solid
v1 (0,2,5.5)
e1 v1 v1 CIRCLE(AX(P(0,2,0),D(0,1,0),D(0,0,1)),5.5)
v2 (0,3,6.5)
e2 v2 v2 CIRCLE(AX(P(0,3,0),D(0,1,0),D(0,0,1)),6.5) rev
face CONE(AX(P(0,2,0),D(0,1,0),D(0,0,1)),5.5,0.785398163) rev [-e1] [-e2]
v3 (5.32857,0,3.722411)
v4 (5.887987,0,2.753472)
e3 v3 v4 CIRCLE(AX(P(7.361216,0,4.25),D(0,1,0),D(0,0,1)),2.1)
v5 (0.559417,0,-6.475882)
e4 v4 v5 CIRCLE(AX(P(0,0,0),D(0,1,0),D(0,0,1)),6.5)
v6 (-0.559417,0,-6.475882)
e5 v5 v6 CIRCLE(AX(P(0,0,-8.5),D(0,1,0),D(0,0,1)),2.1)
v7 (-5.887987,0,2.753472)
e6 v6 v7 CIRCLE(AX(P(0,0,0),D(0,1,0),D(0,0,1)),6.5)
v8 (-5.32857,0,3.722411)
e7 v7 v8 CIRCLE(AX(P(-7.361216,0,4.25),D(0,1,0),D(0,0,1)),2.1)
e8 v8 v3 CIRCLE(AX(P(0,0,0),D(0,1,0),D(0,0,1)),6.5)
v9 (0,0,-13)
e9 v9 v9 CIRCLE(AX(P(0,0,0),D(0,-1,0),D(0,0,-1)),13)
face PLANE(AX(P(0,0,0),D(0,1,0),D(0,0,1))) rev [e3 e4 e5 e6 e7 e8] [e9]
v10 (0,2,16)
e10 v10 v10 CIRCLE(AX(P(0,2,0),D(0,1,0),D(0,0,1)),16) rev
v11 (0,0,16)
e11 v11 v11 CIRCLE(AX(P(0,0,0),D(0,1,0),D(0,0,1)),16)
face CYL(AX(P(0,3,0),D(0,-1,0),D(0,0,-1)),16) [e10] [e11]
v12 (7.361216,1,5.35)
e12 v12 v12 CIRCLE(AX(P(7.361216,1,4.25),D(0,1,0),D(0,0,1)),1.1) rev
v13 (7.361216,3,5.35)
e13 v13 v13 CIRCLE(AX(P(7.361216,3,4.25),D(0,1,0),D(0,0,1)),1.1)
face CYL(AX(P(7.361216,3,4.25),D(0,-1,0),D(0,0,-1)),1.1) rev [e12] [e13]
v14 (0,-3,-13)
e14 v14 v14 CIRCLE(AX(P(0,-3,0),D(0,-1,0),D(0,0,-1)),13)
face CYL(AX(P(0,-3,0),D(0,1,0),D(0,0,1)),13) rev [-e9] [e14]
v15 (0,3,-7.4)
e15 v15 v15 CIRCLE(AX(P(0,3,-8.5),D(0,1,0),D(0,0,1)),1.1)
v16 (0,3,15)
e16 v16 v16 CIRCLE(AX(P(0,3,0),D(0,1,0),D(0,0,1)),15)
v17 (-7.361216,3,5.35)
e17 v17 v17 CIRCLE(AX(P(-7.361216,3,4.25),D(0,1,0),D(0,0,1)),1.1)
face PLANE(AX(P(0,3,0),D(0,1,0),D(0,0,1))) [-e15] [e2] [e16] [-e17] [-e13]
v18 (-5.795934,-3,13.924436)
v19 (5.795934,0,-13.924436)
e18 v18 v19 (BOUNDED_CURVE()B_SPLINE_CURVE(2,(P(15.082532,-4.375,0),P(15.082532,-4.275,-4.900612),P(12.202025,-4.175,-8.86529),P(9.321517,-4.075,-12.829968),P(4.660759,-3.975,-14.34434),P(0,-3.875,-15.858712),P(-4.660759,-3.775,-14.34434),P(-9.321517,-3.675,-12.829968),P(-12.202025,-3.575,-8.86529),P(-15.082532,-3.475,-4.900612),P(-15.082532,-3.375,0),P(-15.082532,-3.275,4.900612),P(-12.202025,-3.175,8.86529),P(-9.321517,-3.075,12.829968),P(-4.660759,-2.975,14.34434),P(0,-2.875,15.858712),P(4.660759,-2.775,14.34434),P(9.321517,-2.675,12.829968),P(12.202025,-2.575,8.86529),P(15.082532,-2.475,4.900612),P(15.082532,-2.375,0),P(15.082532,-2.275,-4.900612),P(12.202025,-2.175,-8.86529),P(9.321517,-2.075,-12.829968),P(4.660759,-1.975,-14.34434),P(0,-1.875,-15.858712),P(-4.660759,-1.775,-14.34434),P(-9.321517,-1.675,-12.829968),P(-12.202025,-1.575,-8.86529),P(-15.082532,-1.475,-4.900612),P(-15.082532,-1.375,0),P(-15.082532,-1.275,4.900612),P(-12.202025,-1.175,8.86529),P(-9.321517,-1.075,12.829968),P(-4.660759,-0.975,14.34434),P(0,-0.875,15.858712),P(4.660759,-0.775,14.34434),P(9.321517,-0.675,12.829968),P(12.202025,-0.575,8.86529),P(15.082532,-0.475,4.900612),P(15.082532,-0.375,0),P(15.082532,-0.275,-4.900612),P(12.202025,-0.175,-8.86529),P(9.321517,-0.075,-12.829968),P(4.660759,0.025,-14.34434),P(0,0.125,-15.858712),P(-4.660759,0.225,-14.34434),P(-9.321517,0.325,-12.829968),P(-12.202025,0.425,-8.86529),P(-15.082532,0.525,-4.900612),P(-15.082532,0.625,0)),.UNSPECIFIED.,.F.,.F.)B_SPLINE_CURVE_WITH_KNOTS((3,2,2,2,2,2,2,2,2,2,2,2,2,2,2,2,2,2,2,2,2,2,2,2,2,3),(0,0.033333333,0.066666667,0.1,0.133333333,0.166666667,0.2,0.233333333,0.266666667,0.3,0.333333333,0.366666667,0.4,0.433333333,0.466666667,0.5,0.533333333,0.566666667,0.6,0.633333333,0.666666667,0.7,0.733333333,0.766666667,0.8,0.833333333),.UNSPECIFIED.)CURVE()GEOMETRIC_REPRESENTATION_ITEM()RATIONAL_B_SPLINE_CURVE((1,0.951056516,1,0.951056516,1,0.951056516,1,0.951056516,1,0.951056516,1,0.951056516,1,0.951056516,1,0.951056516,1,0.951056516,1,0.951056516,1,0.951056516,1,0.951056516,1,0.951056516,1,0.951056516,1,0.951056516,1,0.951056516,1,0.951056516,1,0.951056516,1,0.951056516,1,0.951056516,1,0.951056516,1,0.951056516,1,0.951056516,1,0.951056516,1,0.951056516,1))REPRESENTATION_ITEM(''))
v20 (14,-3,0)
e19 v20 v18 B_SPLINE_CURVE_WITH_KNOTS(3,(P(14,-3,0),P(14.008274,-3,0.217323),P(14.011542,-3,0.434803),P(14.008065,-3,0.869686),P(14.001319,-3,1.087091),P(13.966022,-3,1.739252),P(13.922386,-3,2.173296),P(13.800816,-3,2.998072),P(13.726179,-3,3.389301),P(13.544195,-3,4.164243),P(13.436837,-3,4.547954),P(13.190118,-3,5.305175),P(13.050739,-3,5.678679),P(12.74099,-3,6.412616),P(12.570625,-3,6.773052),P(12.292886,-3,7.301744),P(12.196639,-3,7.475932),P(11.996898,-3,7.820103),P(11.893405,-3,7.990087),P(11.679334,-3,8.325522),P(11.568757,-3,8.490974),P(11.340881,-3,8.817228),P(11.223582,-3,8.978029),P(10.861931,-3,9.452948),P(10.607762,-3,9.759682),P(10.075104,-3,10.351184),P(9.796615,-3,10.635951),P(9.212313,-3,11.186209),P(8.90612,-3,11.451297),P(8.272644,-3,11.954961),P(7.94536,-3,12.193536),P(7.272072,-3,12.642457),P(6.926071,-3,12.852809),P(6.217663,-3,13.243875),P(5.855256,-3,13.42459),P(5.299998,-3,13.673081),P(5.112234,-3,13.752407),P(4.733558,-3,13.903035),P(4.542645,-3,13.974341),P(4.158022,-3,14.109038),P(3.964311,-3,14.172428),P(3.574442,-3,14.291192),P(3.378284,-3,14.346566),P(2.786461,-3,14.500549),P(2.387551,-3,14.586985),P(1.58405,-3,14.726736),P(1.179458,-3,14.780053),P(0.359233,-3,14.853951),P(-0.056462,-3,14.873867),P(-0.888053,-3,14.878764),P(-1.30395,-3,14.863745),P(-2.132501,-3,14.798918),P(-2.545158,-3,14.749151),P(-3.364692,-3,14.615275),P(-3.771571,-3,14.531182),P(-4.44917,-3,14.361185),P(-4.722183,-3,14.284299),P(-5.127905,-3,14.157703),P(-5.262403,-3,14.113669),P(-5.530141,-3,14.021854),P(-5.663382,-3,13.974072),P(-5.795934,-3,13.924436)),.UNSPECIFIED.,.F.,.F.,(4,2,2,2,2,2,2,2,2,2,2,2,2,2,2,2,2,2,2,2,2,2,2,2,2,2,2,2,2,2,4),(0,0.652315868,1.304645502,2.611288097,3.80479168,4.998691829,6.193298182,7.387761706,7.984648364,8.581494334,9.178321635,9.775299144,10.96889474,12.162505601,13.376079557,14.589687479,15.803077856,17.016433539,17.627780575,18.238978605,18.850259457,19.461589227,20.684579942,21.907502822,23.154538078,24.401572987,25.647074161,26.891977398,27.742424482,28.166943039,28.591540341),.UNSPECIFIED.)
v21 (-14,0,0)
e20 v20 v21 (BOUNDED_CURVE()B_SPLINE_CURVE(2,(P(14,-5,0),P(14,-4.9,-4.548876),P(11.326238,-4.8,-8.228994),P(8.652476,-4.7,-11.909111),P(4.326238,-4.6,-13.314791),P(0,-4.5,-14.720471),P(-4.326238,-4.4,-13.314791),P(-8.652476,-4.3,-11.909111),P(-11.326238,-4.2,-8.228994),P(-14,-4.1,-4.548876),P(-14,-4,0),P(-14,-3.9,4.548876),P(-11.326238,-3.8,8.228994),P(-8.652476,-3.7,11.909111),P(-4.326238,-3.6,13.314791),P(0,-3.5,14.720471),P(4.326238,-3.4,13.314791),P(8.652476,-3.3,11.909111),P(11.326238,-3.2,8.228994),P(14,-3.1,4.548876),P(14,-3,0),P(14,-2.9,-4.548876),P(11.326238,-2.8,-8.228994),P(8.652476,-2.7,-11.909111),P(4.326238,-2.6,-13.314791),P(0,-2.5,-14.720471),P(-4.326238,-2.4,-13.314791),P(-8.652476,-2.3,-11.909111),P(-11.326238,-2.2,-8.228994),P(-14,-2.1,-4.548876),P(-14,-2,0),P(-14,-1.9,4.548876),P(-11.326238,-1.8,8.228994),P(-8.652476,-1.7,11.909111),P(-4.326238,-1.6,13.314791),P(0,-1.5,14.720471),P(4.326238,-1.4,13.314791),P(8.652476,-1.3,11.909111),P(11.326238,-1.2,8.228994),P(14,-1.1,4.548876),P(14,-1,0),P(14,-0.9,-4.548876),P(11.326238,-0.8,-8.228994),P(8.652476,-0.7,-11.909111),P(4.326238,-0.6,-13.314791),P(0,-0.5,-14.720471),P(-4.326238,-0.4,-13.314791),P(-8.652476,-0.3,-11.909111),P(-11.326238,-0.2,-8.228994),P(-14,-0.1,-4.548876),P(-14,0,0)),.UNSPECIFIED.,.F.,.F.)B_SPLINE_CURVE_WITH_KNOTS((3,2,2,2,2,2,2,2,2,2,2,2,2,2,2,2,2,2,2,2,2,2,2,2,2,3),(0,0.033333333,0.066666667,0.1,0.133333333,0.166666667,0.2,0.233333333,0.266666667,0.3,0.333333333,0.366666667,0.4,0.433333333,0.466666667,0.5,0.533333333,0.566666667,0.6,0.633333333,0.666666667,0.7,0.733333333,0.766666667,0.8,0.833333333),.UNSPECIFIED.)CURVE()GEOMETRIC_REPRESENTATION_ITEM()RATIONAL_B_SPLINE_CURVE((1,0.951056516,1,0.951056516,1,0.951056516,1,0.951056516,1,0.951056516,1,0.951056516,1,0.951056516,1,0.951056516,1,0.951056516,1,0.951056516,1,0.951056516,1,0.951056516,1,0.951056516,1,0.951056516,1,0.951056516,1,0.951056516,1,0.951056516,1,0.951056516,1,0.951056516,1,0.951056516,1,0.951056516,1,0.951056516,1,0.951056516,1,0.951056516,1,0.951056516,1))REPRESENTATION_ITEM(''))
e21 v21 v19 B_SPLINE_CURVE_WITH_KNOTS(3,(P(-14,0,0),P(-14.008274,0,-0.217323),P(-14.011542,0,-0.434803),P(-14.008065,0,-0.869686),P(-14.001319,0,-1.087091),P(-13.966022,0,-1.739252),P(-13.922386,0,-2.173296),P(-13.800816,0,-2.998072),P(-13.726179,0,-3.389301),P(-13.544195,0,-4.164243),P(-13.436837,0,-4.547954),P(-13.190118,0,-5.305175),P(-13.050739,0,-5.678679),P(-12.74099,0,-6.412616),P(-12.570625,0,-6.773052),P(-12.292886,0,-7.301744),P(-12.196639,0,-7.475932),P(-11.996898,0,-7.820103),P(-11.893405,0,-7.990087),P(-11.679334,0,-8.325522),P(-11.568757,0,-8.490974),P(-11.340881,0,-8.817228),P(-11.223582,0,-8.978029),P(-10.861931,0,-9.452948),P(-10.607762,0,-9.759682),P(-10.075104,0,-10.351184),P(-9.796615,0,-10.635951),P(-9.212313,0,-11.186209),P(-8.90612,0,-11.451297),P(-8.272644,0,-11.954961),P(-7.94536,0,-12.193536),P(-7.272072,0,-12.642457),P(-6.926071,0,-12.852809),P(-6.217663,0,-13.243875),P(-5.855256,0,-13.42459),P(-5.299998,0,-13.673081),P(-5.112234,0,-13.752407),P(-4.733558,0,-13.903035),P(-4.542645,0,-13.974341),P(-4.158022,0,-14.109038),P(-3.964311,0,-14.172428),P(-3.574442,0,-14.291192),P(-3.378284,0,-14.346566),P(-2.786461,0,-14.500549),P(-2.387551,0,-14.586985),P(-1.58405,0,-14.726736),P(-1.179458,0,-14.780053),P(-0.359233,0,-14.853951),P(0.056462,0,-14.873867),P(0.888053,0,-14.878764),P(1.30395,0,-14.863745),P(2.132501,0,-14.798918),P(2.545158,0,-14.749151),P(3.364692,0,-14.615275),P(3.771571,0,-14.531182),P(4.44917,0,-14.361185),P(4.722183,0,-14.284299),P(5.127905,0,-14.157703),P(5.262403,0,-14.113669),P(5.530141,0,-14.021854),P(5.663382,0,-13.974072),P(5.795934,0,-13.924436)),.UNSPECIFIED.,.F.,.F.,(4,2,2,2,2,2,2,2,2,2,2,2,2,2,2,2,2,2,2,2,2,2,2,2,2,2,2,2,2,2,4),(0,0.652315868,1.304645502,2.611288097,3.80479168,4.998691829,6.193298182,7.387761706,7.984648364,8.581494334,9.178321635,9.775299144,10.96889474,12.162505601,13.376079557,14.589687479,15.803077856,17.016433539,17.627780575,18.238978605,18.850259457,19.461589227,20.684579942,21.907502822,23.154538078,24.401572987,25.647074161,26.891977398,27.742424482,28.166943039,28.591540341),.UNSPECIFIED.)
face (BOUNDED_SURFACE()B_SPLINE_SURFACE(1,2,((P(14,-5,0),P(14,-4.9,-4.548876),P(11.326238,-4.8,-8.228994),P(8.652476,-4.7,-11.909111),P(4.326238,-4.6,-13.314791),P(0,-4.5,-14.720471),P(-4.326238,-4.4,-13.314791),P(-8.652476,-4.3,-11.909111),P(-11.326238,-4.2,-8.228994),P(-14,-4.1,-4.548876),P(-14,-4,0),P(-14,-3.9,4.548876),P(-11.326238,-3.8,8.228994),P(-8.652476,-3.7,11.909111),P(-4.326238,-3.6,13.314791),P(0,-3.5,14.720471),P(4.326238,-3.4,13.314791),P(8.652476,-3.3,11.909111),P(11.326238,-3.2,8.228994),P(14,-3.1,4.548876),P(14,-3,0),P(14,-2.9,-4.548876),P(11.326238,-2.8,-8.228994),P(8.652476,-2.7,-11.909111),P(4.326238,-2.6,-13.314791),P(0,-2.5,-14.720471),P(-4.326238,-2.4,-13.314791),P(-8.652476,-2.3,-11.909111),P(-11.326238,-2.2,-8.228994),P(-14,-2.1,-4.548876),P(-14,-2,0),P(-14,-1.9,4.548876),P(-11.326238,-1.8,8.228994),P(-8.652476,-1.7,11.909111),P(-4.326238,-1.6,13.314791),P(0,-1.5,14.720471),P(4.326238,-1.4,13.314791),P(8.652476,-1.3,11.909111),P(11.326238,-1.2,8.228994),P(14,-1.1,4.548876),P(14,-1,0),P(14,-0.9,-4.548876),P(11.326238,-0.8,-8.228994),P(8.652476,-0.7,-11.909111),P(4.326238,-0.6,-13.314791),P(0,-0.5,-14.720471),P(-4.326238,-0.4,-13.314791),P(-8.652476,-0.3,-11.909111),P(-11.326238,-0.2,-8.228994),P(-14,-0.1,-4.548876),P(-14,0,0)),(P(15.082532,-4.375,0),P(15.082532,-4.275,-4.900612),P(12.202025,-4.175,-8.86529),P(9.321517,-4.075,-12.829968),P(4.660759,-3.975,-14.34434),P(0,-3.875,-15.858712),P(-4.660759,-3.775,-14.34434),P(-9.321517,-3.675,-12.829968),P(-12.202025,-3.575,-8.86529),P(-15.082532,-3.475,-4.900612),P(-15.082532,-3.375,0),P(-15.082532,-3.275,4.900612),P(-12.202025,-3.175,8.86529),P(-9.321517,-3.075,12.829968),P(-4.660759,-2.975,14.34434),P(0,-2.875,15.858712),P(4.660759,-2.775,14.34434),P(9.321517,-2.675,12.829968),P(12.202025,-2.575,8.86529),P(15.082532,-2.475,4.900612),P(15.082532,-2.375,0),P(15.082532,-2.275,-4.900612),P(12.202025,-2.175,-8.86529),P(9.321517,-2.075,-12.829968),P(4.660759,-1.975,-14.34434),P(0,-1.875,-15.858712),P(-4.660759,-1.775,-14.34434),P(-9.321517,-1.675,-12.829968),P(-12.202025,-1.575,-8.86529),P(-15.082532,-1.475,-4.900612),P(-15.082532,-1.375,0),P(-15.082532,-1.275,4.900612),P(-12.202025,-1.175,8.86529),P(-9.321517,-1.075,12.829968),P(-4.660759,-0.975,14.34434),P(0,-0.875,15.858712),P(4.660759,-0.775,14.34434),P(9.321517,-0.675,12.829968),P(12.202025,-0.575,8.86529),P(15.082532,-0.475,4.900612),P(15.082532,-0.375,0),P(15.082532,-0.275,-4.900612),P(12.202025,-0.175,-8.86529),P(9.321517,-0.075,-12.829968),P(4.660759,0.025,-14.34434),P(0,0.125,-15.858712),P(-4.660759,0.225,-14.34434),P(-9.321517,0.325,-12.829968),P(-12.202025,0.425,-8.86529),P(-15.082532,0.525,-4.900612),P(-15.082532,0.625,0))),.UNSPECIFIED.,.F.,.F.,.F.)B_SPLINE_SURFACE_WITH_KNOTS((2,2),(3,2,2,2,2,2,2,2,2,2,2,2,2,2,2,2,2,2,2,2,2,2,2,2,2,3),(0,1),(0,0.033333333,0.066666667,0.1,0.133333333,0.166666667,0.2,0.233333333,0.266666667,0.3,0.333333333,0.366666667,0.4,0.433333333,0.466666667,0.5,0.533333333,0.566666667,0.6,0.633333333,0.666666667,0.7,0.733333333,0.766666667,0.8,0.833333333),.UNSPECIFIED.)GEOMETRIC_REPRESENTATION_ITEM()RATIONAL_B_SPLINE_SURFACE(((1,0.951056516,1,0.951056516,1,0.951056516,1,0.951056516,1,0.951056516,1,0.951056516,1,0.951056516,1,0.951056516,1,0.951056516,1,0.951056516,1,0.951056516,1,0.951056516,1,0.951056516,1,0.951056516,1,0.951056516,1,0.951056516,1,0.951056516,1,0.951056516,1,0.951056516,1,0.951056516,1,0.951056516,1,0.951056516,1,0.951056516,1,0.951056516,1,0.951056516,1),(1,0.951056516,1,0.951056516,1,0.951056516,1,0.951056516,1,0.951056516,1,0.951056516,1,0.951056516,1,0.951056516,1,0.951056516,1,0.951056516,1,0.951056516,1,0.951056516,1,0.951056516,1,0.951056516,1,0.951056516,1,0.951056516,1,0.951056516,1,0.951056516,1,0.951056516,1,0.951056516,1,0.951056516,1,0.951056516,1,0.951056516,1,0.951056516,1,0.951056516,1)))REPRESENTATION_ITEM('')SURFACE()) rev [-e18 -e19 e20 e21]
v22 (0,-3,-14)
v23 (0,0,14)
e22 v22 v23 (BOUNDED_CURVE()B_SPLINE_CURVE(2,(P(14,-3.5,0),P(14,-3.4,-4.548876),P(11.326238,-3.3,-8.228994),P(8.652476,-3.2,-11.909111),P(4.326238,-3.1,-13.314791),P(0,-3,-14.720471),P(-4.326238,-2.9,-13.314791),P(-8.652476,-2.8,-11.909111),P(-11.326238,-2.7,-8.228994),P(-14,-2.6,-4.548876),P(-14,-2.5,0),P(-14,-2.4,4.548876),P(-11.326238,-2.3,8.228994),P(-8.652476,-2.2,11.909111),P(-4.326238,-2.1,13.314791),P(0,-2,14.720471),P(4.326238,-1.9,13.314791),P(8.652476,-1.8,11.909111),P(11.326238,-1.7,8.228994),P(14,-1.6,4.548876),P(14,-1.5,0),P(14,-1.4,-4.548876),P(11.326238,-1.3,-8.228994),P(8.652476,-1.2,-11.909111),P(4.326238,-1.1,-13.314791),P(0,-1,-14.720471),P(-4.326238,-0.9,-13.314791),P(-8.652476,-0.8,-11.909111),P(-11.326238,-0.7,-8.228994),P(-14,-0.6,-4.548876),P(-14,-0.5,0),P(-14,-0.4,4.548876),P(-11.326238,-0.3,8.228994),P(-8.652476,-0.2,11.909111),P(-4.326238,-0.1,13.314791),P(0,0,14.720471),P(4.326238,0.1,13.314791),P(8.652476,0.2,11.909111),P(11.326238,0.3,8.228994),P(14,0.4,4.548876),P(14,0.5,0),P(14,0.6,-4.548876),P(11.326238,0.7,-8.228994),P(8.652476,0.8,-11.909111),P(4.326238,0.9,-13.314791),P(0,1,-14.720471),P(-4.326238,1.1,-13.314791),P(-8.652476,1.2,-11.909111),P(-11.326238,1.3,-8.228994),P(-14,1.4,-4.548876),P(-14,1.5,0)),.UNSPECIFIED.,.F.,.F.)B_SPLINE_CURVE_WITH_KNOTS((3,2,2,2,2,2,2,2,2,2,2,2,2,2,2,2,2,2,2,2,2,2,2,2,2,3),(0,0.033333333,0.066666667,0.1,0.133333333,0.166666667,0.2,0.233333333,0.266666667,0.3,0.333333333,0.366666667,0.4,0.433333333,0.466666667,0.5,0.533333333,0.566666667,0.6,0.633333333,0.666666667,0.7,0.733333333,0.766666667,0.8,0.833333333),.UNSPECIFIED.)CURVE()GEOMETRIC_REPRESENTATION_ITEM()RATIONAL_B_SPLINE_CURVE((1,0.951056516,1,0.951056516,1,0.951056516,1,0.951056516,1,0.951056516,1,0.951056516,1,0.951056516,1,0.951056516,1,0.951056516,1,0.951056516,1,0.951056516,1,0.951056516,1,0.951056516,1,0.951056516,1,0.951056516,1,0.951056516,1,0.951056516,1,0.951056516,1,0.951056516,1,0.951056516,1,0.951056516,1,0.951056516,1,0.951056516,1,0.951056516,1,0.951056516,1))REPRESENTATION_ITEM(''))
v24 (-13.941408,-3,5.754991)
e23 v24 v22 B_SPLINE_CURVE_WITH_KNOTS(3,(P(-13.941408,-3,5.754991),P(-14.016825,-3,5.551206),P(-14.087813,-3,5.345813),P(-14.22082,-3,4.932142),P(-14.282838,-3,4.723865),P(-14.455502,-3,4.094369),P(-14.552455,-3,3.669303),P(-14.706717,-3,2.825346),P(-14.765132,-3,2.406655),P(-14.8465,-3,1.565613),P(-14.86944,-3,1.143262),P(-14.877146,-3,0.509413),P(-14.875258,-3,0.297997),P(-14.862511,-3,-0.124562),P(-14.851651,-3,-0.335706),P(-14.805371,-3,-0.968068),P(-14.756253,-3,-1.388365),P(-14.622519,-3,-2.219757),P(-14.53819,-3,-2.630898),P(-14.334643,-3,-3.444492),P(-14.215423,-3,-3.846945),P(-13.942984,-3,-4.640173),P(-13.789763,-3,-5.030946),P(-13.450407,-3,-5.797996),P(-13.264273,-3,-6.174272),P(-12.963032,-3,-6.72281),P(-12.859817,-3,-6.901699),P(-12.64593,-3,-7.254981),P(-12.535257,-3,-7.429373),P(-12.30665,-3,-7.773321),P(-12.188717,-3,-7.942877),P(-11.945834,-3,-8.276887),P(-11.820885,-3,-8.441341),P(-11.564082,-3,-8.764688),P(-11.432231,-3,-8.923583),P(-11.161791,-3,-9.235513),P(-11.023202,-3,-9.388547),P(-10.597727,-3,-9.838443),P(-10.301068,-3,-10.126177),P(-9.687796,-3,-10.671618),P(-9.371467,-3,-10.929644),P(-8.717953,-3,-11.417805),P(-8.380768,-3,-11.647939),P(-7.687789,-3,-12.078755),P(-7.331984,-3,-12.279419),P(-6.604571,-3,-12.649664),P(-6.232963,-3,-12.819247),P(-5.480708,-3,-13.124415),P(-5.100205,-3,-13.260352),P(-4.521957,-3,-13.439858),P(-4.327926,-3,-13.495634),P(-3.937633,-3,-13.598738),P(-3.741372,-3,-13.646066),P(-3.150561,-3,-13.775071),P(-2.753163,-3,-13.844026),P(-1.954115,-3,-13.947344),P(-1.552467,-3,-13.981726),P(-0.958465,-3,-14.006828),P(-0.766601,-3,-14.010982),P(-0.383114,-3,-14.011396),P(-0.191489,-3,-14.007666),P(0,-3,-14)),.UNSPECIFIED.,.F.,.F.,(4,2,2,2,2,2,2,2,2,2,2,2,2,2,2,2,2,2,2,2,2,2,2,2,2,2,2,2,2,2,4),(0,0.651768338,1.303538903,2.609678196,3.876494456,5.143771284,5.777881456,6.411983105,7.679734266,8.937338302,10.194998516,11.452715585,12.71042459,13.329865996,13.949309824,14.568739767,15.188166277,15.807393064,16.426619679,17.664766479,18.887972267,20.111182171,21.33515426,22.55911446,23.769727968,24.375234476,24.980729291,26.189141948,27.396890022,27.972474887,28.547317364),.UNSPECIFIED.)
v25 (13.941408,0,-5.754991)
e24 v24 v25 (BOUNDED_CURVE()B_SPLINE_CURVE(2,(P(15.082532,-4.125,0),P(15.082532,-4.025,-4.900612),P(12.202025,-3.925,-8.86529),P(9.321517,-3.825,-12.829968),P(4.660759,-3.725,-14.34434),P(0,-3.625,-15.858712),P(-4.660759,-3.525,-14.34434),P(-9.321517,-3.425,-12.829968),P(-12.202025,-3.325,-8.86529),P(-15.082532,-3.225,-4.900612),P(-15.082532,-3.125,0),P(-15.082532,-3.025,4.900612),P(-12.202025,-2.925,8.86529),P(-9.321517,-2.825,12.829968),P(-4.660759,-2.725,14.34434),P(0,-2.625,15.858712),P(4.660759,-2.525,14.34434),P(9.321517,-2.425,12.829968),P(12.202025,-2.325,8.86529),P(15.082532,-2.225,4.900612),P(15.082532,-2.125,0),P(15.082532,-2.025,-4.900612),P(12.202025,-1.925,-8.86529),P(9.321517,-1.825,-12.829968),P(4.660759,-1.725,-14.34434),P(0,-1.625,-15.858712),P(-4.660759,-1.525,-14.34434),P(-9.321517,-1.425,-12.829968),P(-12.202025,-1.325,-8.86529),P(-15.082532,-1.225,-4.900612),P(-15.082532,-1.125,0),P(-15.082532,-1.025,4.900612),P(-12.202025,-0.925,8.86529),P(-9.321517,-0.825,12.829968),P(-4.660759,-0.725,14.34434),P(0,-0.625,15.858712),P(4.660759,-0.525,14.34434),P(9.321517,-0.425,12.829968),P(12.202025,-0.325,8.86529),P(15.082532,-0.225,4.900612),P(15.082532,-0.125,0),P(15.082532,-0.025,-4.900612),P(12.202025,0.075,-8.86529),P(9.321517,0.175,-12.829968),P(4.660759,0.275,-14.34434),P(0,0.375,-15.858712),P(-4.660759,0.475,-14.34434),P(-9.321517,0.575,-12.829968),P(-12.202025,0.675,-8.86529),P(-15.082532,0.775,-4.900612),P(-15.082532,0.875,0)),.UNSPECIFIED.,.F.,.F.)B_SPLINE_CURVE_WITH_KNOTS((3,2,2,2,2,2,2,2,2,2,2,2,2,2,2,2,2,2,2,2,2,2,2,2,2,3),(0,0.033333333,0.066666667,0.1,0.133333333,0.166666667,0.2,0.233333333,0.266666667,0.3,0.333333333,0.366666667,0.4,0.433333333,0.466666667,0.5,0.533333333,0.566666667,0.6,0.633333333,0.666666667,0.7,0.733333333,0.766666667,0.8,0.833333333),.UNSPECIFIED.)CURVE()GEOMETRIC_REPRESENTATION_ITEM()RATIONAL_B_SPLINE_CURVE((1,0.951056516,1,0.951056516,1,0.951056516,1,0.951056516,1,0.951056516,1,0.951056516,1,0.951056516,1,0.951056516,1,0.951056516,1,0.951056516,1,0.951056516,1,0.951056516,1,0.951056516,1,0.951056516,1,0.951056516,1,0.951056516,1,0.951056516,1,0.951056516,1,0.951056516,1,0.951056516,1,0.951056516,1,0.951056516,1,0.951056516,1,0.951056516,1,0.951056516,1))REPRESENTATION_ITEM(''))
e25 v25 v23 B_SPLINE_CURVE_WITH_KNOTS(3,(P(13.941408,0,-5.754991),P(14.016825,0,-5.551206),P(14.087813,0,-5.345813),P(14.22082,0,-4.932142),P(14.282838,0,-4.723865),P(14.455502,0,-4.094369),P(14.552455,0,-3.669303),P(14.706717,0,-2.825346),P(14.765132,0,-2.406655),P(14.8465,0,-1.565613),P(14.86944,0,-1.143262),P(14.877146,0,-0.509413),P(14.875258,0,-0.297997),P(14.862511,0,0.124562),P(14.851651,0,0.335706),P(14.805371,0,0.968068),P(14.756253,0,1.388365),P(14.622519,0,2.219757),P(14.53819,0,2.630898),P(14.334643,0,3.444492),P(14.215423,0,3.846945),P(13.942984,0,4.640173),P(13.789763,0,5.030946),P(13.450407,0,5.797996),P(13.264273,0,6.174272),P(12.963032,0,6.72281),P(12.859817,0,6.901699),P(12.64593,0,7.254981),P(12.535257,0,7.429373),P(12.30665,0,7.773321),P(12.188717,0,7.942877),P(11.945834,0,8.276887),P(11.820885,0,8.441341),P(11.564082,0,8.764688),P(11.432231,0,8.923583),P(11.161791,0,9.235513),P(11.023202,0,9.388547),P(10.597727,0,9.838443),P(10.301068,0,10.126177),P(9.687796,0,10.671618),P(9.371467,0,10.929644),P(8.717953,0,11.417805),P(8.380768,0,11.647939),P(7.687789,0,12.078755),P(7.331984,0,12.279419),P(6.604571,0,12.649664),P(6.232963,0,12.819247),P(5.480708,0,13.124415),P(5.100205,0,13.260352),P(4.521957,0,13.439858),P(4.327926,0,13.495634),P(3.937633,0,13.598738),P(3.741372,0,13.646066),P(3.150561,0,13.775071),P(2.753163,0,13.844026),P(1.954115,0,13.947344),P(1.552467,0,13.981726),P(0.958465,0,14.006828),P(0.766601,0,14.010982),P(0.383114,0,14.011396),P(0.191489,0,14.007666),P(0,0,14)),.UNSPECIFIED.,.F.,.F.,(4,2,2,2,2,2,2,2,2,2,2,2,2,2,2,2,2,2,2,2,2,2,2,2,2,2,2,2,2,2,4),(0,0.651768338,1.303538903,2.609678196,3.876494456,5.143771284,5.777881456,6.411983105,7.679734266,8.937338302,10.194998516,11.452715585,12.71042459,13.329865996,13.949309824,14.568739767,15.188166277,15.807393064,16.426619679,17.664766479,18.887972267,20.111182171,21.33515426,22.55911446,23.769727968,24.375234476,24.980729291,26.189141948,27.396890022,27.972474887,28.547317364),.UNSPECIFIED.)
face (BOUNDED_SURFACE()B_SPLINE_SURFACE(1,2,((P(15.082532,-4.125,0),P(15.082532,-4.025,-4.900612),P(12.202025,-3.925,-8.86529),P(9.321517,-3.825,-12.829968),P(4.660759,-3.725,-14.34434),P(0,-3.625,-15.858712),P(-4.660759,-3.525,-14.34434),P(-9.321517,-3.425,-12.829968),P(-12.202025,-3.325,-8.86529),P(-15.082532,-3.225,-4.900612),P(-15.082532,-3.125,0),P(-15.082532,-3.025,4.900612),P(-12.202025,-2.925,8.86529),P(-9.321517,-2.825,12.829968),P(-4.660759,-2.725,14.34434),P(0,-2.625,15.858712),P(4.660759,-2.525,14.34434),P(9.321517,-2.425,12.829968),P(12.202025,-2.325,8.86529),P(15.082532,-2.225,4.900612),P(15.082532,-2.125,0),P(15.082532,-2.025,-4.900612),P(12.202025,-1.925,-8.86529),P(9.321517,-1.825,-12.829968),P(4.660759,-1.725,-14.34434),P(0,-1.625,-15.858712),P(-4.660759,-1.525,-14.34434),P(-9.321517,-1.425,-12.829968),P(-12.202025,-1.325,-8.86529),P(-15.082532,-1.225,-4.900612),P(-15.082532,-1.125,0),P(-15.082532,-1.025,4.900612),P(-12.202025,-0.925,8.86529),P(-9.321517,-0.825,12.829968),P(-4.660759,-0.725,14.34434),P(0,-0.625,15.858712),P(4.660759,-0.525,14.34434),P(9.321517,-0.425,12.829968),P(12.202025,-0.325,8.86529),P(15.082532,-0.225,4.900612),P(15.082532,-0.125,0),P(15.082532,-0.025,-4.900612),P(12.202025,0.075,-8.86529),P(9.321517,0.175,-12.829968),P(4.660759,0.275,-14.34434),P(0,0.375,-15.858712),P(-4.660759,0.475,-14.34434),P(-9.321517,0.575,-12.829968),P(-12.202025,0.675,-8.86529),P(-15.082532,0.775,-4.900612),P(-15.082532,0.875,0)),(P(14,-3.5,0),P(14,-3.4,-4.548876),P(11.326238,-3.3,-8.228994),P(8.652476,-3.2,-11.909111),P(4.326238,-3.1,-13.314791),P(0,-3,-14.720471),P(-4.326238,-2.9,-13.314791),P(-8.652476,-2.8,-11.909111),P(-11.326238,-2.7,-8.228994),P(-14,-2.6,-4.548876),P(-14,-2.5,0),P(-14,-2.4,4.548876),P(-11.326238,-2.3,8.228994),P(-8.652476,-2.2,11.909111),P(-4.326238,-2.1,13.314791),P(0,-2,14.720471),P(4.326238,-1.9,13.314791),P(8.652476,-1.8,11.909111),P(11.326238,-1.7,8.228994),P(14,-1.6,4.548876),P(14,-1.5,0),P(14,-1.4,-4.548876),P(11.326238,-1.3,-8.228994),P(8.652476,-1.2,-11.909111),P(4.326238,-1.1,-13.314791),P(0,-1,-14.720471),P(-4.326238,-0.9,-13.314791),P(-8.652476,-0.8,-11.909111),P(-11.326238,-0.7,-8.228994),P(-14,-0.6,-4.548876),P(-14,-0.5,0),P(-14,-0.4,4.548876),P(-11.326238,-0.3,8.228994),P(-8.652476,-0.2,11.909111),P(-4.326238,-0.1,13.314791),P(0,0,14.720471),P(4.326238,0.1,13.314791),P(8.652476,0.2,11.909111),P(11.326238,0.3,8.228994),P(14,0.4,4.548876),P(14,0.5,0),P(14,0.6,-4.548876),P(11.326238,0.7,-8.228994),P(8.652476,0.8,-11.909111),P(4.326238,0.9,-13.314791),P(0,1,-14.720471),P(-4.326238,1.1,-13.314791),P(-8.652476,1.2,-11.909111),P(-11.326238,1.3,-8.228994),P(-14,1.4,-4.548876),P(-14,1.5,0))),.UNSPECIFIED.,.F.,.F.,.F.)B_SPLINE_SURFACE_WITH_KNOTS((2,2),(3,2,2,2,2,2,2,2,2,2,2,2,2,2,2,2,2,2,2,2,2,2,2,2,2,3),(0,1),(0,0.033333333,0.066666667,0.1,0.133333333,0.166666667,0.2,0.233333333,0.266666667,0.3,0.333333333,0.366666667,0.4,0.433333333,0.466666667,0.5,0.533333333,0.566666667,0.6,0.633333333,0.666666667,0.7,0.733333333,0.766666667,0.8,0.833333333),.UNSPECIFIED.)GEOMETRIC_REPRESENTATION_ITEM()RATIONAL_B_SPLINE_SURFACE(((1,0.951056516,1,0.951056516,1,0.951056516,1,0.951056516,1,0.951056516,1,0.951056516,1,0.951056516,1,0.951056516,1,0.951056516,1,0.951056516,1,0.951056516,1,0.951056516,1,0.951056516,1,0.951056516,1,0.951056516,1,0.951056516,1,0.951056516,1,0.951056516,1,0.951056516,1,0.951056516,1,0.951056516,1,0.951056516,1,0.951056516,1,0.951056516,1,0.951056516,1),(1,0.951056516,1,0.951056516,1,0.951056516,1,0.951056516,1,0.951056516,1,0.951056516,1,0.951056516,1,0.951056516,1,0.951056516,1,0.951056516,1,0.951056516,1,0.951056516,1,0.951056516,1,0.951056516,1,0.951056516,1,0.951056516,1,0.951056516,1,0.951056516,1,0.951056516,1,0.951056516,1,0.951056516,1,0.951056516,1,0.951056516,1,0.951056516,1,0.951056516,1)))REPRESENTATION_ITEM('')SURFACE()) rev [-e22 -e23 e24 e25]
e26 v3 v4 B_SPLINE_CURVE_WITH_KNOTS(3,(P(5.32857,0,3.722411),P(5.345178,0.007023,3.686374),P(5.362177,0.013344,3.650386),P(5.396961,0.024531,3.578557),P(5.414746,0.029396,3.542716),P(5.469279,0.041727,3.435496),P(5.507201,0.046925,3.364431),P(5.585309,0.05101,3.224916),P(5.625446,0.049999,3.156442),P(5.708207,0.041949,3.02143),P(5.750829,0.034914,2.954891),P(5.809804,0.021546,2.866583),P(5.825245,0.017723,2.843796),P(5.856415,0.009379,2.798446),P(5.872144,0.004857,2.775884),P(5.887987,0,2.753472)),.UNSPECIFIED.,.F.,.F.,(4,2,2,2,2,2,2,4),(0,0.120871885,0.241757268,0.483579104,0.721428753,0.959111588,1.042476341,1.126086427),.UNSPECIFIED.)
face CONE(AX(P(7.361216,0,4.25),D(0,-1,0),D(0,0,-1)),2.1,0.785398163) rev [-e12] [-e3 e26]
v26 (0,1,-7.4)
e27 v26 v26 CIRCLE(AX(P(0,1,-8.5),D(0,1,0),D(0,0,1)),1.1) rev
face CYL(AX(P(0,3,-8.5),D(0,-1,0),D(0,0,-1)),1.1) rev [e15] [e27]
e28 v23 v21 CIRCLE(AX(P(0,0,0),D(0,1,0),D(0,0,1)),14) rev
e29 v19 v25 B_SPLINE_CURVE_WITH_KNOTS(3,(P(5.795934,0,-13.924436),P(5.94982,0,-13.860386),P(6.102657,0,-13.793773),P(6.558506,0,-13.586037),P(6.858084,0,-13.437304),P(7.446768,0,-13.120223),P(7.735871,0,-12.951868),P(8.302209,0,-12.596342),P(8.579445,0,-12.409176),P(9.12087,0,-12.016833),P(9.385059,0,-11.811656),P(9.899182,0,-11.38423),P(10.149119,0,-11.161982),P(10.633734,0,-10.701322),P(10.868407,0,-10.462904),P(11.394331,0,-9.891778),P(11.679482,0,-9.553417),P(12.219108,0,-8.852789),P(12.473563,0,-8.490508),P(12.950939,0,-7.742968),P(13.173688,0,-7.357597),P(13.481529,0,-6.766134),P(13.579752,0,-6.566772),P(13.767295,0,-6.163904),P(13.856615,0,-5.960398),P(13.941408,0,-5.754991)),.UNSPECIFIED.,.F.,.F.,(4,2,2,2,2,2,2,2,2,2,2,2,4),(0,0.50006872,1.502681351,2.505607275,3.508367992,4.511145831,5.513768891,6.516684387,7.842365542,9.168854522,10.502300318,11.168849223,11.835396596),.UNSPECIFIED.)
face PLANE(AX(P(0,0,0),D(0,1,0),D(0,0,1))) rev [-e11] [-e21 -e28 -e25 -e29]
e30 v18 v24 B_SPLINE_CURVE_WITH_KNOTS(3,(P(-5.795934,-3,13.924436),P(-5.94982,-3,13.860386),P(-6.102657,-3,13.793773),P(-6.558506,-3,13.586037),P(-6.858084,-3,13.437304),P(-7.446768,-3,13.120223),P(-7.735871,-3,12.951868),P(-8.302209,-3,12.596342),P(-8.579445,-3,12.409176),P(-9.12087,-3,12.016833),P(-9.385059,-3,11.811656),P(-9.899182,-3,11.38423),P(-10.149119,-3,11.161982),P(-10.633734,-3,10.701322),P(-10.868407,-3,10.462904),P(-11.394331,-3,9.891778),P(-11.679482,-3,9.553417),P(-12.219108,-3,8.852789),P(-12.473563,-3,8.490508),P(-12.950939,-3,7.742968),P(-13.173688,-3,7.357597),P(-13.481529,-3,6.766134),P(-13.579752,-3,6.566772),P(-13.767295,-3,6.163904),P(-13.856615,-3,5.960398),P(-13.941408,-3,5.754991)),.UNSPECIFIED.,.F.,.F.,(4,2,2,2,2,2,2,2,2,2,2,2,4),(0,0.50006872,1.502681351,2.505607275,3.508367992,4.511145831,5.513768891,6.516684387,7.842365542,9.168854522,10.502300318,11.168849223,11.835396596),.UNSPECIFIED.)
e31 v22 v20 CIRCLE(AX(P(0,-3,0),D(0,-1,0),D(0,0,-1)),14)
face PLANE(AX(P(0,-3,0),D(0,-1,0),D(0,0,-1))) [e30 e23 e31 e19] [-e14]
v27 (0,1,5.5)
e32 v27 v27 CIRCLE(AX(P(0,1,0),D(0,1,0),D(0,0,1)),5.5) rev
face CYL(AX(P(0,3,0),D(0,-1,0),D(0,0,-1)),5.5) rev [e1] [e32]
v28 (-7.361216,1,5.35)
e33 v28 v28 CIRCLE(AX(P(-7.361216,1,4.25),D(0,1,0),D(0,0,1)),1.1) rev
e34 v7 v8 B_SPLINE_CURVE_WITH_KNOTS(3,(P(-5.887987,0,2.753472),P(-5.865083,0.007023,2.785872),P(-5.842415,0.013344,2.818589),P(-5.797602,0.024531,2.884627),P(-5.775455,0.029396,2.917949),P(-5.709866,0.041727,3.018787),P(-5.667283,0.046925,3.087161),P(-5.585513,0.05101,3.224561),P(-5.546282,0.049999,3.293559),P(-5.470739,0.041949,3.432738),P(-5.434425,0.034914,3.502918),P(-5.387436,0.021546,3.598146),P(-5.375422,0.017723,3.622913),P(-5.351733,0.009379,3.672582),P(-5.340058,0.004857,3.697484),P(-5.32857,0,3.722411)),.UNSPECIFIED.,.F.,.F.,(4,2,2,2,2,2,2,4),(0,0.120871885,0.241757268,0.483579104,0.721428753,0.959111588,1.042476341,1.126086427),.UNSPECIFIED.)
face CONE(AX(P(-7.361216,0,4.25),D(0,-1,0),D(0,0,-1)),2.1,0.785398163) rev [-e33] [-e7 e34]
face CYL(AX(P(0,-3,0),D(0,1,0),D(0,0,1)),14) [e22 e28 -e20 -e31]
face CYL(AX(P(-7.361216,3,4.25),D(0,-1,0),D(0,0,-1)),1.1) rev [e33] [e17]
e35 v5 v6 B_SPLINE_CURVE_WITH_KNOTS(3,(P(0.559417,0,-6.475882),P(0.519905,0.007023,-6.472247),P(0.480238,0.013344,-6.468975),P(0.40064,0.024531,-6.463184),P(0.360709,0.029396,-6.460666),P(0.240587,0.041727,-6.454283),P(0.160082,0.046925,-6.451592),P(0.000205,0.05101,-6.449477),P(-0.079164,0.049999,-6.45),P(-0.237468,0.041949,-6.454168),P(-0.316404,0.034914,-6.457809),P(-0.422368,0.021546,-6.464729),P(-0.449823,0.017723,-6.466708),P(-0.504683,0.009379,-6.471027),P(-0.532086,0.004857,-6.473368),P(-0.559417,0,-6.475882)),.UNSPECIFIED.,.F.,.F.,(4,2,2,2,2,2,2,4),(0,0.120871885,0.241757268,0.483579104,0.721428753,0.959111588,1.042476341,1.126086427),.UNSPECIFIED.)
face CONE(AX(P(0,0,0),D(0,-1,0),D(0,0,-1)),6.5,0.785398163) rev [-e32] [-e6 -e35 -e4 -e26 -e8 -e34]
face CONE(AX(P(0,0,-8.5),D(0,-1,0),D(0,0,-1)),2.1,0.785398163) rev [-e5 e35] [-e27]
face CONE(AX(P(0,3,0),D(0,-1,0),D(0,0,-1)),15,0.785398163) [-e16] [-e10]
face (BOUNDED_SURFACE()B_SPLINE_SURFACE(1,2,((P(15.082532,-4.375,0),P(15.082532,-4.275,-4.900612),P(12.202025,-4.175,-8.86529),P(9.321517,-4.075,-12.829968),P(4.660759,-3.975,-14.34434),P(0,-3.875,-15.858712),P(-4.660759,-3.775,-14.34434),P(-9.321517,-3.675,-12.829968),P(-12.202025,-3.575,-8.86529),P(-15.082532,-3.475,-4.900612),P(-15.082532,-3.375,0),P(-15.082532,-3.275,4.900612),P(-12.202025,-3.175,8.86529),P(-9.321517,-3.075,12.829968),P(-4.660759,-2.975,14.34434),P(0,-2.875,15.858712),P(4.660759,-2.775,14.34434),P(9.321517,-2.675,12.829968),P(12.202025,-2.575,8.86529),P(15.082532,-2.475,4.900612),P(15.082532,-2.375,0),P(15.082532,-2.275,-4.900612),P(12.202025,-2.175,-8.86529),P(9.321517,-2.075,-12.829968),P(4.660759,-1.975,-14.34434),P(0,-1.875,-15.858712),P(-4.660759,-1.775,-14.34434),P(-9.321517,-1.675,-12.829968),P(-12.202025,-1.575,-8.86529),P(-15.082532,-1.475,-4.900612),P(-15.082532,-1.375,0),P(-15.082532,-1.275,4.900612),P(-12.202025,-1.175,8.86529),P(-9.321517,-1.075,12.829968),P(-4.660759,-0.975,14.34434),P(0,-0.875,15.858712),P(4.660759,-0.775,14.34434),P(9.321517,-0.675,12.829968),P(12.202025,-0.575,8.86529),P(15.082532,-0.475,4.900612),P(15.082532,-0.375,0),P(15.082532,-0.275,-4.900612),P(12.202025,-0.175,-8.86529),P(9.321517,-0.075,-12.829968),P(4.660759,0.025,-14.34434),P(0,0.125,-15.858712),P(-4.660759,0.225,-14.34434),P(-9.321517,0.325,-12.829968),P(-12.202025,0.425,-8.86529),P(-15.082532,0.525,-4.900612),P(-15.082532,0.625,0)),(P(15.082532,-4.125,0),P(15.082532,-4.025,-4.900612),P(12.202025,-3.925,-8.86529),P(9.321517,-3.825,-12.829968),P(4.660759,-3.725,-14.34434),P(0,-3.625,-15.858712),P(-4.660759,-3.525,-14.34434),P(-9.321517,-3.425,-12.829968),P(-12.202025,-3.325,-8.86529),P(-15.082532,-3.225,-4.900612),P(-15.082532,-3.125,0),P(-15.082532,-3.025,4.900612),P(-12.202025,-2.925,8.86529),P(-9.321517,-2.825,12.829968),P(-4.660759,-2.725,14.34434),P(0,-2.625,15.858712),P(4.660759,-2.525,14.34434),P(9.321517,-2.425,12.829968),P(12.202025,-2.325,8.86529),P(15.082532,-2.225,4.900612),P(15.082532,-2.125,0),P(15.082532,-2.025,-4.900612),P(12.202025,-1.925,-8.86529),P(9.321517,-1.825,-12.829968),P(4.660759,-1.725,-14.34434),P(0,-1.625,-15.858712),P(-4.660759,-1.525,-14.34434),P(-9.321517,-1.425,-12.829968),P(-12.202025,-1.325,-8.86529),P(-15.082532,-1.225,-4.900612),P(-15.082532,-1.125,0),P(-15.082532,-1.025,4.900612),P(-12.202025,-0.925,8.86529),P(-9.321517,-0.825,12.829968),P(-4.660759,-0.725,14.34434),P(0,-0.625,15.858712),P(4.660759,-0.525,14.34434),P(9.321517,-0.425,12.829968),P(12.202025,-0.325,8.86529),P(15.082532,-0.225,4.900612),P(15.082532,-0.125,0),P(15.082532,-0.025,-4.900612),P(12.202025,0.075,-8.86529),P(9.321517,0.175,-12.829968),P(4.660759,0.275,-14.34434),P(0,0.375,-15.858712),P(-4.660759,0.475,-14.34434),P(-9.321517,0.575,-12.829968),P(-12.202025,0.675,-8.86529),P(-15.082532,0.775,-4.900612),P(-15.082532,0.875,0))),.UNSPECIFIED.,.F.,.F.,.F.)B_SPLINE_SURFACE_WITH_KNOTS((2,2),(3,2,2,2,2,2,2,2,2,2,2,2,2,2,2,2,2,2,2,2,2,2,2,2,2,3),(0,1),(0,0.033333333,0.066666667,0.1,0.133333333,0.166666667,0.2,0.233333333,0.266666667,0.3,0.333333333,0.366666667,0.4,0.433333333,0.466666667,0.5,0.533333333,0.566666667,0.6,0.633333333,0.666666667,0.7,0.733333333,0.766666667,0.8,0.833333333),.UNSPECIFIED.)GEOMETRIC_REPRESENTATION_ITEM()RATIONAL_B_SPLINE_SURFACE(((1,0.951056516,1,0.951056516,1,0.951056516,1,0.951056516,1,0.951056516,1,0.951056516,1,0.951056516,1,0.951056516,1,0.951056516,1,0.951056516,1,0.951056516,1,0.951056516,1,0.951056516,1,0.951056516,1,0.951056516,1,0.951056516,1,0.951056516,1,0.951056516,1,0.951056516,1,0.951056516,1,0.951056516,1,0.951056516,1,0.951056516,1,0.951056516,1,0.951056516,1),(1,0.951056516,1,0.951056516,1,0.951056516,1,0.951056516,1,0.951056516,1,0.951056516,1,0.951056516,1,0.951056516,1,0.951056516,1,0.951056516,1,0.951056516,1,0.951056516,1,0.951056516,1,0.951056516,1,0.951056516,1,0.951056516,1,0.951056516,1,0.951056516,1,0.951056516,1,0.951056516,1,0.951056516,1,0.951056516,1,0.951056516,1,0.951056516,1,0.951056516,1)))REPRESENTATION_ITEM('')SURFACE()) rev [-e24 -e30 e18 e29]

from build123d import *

# Parameters (mm, degrees)
SKETCH_1_R      = 16
SKETCH_1_R_2    = 1.1
SKETCH_1_R_3    = 5.5
EXTRUDE_1_DEPTH = 3
SKETCH_2_R      = 14
SKETCH_2_R_2    = 13
EXTRUDE_2_DEPTH = 3
THREAD_1_PITCH  = 2
THREAD_1_FROM   = 2
CHAMFER_1_SIZE  = 1
CHAMFER_2_SIZE  = 1


with BuildPart() as part:
    # Sketch 1 → Бобышка-Вытянуть1 (new body)
    with BuildSketch(Plane(origin=(0, 0, 0), x_dir=(1, 0, 0), z_dir=(0, 1, 0))):
        with Locations(Location((0, 0, 0), (0, 0, 270))):
            Circle(SKETCH_1_R)
        with Locations(Location((0, 8.5, 0), (0, 0, 270))):
            Circle(SKETCH_1_R_2, mode=Mode.SUBTRACT)
        with Locations(Location((7.361215932, -4.25, 0), (0, 0, 270))):
            Circle(SKETCH_1_R_2, mode=Mode.SUBTRACT)
        with Locations(Location((-7.361215932, -4.25, 0), (0, 0, 270))):
            Circle(SKETCH_1_R_2, mode=Mode.SUBTRACT)
        with Locations(Location((0, 0, 0), (0, 0, 270))):
            Circle(SKETCH_1_R_3, mode=Mode.SUBTRACT)
    extrude(amount=EXTRUDE_1_DEPTH)

    # Эскиз2 → Бобышка-Вытянуть2 (add)
    with BuildSketch(Plane.XZ):
        with Locations(Location((0, 0, 0), (0, 0, 90))):
            Circle(SKETCH_2_R)
        with Locations(Location((0, 0, 0), (0, 0, 270))):
            Circle(SKETCH_2_R_2, mode=Mode.SUBTRACT)
    extrude(amount=EXTRUDE_2_DEPTH)

    # Резьба1: arcs per turn and ends read off the stored shape
    # Резьба1: the profile of Sketch 1 2 profile screwed along a right-hand helix through 2.5 turns, 10 arcs to a turn; built about Z, then put on its axis
    thread_1_z = Axis((0, 0, 0), (0, 0, 1))
    thread_1_corners = [(13.9997, 0, -0.000173205), (15.08253175, 0, 0.624999997), (15.08253175, 0, 0.874999997), (13.9997, 0, 1.5001732)]
    with BuildLine(mode=Mode.PRIVATE) as thread_1_profile:
        Line(thread_1_corners[0], thread_1_corners[1])
        Line(thread_1_corners[1], thread_1_corners[2])
        Line(thread_1_corners[2], thread_1_corners[3])
        Line(thread_1_corners[3], thread_1_corners[0])
    thread_1_cap = Face(thread_1_profile.wire())
    thread_1_turn_angles = [0, 18, 36, 54, 72, 90, 108, 126, 144, 162, 180, 198, 216, 234, 252, 270, 288, 306, 324, 342, 360]
    thread_1_turn_weights = [1, 0.9510565162951535, 1, 0.9510565162951535, 1, 0.9510565162951535, 1, 0.9510565162951535, 1, 0.9510565162951535, 1, 0.9510565162951535, 1, 0.9510565162951535, 1, 0.9510565162951535, 1, 0.9510565162951535, 1, 0.9510565162951535, 1]
    thread_1_turn_rails = [Edge.make_bspline([Vector(p[0], p[1], 0).rotate(thread_1_z, thread_1_turn_angles[k]) / thread_1_turn_weights[k] + Vector(0, 0, p[2] + THREAD_1_PITCH * thread_1_turn_angles[k] / 360) for k in range(21)], [0, 0, 0, 1, 1, 2, 2, 3, 3, 4, 4, 5, 5, 6, 6, 7, 7, 8, 8, 9, 9, 10, 10, 10], 2, thread_1_turn_weights) for p in thread_1_corners]
    thread_1_turn_sides = [Face.make_surface_from_curves(thread_1_turn_rails[p[0]], thread_1_turn_rails[p[1]]) for p in [(0, 1), (1, 2), (2, 3), (3, 0)]]
    thread_1_last_angles = [720, 738, 756, 774, 792, 810, 828, 846, 864, 882, 900]
    thread_1_last_weights = [1, 0.9510565162951535, 1, 0.9510565162951535, 1, 0.9510565162951535, 1, 0.9510565162951535, 1, 0.9510565162951535, 1]
    thread_1_last_rails = [Edge.make_bspline([Vector(p[0], p[1], 0).rotate(thread_1_z, thread_1_last_angles[k]) / thread_1_last_weights[k] + Vector(0, 0, p[2] + THREAD_1_PITCH * thread_1_last_angles[k] / 360) for k in range(11)], [0, 0, 0, 1, 1, 2, 2, 3, 3, 4, 4, 5, 5, 5], 2, thread_1_last_weights) for p in thread_1_corners]
    thread_1_last_sides = [Face.make_surface_from_curves(thread_1_last_rails[p[0]], thread_1_last_rails[p[1]]) for p in [(0, 1), (1, 2), (2, 3), (3, 0)]]
    thread_1 = Plane(origin=(0, -5, 0), x_dir=(1, 0, 0), z_dir=(0, 1, 0)) * split(Solid(Shell([*[p.moved(Location((0, 0, THREAD_1_PITCH * i))) for i in range(2) for p in thread_1_turn_sides], *thread_1_last_sides, thread_1_cap, thread_1_cap.rotate(thread_1_z, 900).moved(Location((0, 0, THREAD_1_PITCH * 900 / 360)))])), bisect_by=Plane.XY.offset(THREAD_1_FROM), keep=Keep.TOP, mode=Mode.PRIVATE)
    add(thread_1)

    # Фаска1
    chamfer_1_edges = [part.edges().sort_by_distance(p)[0] for p in [
        (7.361215932, 0, 3.15),
        (-7.361215932, 0, 3.15),
        (0, 3, -16),
        (0, 0, -9.6),
        (0, 3, -5.5),
    ]]
    chamfer(chamfer_1_edges, length=CHAMFER_1_SIZE)

    # Фаска2
    # the kernel refuses this chamfer: 1 mm, written as the material it takes off along each edge
    with BuildSketch(Plane(origin=(0, 0, 0), x_dir=(0, 0, 1), z_dir=(-1, 0, 0))) as chamfer_2_piece_1:
        Polygon((5.5, CHAMFER_2_SIZE), (5.5 + CHAMFER_2_SIZE, 0), (5.5, 0), align=None)
    revolve(axis=Axis((0, 0, 0), (0, 1, 0)), mode=Mode.SUBTRACT)


solid = part.part
